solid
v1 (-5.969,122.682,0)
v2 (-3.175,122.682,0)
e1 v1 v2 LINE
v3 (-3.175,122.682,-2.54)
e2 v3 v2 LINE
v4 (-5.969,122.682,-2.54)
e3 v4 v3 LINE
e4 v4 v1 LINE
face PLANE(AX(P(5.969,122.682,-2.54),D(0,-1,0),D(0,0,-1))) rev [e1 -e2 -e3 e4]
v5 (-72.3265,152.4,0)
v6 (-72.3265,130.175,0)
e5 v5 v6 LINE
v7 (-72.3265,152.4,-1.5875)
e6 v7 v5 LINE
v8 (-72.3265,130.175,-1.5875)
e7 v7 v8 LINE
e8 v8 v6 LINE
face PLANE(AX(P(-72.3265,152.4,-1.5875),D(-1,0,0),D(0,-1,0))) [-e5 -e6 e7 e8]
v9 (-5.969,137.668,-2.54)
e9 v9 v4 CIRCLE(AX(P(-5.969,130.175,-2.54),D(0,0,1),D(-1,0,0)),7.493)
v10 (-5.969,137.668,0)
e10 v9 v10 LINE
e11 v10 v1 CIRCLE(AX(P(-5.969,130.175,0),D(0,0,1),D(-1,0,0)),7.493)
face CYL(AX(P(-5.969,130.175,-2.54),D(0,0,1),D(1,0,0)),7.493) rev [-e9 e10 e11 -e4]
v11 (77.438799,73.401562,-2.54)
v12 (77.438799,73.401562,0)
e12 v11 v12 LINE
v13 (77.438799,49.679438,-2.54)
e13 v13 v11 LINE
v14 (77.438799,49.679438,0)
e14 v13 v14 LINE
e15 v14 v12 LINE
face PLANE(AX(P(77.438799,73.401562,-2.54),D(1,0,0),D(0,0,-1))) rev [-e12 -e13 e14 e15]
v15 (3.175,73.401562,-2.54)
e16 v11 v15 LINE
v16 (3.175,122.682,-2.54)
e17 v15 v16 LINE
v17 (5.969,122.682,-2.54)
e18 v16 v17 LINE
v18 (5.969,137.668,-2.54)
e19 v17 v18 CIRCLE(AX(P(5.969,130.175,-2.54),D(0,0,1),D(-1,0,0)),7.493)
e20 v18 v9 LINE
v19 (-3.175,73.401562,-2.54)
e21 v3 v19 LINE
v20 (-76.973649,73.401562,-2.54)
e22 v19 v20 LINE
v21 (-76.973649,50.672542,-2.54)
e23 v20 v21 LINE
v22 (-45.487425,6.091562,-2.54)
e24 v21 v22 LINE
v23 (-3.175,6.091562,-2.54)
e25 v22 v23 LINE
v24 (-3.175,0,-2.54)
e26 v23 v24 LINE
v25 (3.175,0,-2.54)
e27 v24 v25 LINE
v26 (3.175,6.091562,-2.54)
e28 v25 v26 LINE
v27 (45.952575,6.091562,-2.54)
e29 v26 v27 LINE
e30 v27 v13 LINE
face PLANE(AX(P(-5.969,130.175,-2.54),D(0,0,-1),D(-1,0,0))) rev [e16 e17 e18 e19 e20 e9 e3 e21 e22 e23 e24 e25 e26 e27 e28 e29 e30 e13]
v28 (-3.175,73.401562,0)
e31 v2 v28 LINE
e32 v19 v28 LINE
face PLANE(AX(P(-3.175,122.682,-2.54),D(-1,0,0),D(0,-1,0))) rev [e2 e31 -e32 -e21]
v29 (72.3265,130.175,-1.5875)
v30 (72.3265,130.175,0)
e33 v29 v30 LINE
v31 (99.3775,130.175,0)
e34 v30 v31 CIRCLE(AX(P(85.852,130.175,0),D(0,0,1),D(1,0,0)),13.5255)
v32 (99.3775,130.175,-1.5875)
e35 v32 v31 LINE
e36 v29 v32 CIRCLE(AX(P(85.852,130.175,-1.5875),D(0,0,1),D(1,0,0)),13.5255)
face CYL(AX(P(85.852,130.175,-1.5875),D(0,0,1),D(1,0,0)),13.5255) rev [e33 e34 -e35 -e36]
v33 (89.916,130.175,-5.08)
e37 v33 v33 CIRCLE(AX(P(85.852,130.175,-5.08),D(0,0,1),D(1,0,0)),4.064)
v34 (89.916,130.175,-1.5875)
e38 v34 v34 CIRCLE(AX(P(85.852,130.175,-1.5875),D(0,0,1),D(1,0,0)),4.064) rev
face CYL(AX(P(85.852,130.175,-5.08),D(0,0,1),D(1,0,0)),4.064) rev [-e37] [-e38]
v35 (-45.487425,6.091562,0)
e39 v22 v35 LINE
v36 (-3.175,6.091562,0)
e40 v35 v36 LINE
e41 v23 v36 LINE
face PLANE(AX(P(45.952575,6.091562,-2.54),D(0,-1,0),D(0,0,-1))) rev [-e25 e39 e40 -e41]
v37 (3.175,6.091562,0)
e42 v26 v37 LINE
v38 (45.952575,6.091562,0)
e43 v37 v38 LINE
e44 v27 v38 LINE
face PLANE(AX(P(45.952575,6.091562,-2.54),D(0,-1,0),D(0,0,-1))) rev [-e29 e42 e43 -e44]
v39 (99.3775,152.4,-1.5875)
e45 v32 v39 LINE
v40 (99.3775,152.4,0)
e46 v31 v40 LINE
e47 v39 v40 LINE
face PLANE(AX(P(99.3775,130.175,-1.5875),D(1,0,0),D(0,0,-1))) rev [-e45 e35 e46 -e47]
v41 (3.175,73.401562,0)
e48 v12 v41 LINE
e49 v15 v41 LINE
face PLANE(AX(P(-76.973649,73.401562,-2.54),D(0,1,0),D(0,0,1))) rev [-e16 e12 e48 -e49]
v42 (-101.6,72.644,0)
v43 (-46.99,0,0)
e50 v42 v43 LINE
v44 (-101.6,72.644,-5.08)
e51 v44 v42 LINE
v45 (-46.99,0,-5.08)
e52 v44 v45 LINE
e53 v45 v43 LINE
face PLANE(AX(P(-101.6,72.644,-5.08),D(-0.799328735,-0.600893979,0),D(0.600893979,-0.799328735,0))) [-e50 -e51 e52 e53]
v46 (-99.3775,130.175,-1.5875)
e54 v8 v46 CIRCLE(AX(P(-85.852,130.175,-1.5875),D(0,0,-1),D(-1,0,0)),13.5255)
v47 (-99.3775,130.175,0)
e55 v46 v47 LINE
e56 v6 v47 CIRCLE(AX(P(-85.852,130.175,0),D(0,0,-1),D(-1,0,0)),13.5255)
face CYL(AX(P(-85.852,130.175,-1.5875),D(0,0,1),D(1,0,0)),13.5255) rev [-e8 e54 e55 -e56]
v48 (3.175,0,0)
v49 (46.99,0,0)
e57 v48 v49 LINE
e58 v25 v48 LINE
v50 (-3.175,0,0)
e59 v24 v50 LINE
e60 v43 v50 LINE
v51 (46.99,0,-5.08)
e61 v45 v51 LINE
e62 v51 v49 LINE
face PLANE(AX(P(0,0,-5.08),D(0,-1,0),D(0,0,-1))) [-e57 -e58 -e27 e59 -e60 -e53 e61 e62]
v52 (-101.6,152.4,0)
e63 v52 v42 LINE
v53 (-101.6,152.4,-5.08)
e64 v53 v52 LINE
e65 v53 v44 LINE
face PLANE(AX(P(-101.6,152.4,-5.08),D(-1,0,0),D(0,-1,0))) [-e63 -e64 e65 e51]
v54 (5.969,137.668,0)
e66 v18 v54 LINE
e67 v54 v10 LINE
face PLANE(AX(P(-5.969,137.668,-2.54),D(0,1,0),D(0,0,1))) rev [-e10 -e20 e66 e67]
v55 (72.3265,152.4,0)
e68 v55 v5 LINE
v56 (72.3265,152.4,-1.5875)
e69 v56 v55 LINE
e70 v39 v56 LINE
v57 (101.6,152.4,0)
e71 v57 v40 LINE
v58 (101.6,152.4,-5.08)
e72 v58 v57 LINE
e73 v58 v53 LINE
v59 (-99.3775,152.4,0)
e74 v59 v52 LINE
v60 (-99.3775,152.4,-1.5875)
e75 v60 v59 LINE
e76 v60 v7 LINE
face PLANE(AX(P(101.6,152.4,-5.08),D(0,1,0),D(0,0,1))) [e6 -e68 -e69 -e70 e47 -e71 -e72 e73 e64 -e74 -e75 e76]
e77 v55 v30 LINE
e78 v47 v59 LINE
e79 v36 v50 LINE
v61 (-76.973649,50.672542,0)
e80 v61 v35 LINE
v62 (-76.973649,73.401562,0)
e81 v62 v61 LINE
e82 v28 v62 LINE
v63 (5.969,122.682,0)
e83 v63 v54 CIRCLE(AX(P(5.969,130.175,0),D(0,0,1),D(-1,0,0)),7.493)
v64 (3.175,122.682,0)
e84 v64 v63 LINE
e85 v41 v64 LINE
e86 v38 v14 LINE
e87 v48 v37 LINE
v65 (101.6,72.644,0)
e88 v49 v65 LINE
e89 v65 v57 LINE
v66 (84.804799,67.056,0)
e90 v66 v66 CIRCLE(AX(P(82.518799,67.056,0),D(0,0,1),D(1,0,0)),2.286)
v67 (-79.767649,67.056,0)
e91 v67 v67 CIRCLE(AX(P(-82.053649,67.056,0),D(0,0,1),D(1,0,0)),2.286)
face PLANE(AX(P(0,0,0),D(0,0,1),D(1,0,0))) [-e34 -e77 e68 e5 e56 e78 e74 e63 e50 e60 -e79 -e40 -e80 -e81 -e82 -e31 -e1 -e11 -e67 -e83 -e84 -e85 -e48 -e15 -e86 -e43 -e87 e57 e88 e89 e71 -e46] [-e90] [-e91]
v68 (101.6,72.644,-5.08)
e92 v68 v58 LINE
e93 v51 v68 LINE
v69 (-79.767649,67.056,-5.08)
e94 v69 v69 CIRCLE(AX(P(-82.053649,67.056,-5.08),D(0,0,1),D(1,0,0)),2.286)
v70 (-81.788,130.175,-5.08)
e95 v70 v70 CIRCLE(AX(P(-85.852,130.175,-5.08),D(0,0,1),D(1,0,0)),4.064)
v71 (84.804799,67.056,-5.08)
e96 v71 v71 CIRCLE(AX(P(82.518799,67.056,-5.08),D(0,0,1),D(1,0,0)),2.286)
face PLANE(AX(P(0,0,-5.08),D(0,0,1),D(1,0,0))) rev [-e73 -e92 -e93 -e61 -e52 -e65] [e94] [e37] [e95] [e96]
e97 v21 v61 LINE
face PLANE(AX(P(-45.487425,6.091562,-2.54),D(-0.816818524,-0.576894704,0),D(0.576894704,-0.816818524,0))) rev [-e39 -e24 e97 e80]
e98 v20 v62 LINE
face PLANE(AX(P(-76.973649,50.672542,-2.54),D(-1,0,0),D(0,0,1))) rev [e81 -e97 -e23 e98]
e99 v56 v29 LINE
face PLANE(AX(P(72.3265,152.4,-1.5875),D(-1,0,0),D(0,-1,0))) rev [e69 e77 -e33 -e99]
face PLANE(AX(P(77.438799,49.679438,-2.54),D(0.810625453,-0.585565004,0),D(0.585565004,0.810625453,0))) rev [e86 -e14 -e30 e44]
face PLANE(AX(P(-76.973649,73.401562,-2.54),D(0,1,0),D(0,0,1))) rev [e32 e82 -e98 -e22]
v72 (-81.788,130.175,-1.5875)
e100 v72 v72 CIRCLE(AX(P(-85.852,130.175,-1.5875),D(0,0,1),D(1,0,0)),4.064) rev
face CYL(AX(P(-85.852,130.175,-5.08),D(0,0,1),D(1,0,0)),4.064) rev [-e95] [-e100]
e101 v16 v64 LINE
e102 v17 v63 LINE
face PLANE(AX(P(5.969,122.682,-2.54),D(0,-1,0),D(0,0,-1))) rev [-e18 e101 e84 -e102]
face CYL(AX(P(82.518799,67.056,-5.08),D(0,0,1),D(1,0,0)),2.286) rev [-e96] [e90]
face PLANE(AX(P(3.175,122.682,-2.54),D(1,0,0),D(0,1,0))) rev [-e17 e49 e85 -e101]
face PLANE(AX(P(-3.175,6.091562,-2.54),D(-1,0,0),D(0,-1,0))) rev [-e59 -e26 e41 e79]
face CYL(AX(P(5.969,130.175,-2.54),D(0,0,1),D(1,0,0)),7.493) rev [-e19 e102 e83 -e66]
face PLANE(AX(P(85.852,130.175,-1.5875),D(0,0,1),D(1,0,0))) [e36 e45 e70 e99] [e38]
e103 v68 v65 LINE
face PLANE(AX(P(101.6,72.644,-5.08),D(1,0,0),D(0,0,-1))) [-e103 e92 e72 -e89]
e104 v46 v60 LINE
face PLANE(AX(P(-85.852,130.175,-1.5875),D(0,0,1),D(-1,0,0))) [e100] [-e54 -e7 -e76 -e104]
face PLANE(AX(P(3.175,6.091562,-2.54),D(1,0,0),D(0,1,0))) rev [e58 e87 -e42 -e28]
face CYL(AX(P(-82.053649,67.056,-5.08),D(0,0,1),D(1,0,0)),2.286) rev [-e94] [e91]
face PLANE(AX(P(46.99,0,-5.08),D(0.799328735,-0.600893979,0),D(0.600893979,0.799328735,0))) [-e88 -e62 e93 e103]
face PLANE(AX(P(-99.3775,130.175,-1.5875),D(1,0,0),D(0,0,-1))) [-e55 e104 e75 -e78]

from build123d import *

# Parameters (mm, degrees)
BASE_FLANGE1_DEPTH        = 5.08
TAIL_CONNECTION_DEPTH     = 2.54
SKETCH4_R                 = 4.064
TAB_BOLT_HOLES_DEPTH      = 184.232438176
BATTERY_CUTOUT_DEPTH      = 2.54
SKETCH6_W                 = 6.35
SKETCH6_H                 = 49.280438222
TOP_WIRE_CONNECTION_DEPTH = 2.54
SKETCH7_W                 = 6.35
SKETCH7_H                 = 6.091561778
BOTTOM_WIRES_DEPTH        = 2.54
SKETCH8_R                 = 2.286
BOTTOM_BOLTS_DEPTH        = 184.232438176
CUT_EXTRUDE10_DEPTH       = 1.5875


# Sheet-metal steps are written as plain solids
with BuildPart() as part:
    # Sketch1 → Base-Flange1 (new body)
    with BuildSketch(Plane.XY):
        Polygon((0, 0), (46.99, 0), (101.6, 72.644), (101.6, 152.4), (-101.6, 152.4), (-101.6, 72.644), (-46.99, 0), align=None)
    extrude(amount=-BASE_FLANGE1_DEPTH)

    # Sketch2 → Tail Connection (cut)
    with BuildSketch(Plane.XY):
        with BuildLine():
            Line((-5.969, 137.668), (5.969, 137.668))
            ThreePointArc((5.969, 137.668), (13.462, 130.175), (5.969, 122.682))
            Line((5.969, 122.682), (-5.969, 122.682))
            ThreePointArc((-5.969, 122.682), (-13.462, 130.175), (-5.969, 137.668))
        make_face()
    extrude(amount=-TAIL_CONNECTION_DEPTH, mode=Mode.SUBTRACT)

    # Sketch4 → Tab Bolt Holes (cut, through all)
    with BuildSketch(Plane.XY):
        with Locations((-85.852, 130.175)):
            Circle(SKETCH4_R)
        with Locations((85.852, 130.175)):
            Circle(SKETCH4_R)
    extrude(amount=-TAB_BOLT_HOLES_DEPTH, mode=Mode.SUBTRACT)

    # Sketch5 → Battery Cutout (cut)
    with BuildSketch(Plane.XY):
        Polygon((-76.973649394, 50.672541858), (-76.973649394, 73.401561778), (77.43879929, 73.401561778), (77.43879929, 49.679437927), (45.952574948, 6.091561778), (-45.487425052, 6.091561778), align=None)
    extrude(amount=-BATTERY_CUTOUT_DEPTH, mode=Mode.SUBTRACT)

    # Sketch6 → Top Wire Connection (cut)
    with BuildSketch(Plane.XY):
        with Locations((0, 98.041780889)):
            Rectangle(SKETCH6_W, SKETCH6_H)
    extrude(amount=-TOP_WIRE_CONNECTION_DEPTH, mode=Mode.SUBTRACT)

    # Sketch7 → Bottom Wires (cut)
    with BuildSketch(Plane.XY):
        with Locations((0, 3.045780889)):
            Rectangle(SKETCH7_W, SKETCH7_H)
    extrude(amount=-BOTTOM_WIRES_DEPTH, mode=Mode.SUBTRACT)

    # Sketch8 → Bottom Bolts (cut, through all)
    with BuildSketch(Plane.XY):
        with Locations((-82.053649394, 67.056)):
            Circle(SKETCH8_R)
        with Locations((82.51879929, 67.056)):
            Circle(SKETCH8_R)
    extrude(amount=-BOTTOM_BOLTS_DEPTH, mode=Mode.SUBTRACT)

    # Sketch9 → Cut-Extrude10 (cut)
    with BuildSketch(Plane.XY):
        with BuildLine():
            Line((72.3265, 152.4), (72.3265, 130.175))
            ThreePointArc((72.3265, 130.175), (85.852, 116.6495), (99.3775, 130.175))
            Line((99.3775, 130.175), (99.3775, 152.4))
            Line((99.3775, 152.4), (72.3265, 152.4))
        make_face()
    cut_extrude10 = extrude(amount=-CUT_EXTRUDE10_DEPTH, mode=Mode.SUBTRACT)

    # Mirror1: Cut-Extrude10 across plane
    add(cut_extrude10.mirror(Plane(origin=(0, 0, 0), x_dir=(0, 0, 1), z_dir=(1, 0, 0))), mode=Mode.SUBTRACT)


solid = part.part
